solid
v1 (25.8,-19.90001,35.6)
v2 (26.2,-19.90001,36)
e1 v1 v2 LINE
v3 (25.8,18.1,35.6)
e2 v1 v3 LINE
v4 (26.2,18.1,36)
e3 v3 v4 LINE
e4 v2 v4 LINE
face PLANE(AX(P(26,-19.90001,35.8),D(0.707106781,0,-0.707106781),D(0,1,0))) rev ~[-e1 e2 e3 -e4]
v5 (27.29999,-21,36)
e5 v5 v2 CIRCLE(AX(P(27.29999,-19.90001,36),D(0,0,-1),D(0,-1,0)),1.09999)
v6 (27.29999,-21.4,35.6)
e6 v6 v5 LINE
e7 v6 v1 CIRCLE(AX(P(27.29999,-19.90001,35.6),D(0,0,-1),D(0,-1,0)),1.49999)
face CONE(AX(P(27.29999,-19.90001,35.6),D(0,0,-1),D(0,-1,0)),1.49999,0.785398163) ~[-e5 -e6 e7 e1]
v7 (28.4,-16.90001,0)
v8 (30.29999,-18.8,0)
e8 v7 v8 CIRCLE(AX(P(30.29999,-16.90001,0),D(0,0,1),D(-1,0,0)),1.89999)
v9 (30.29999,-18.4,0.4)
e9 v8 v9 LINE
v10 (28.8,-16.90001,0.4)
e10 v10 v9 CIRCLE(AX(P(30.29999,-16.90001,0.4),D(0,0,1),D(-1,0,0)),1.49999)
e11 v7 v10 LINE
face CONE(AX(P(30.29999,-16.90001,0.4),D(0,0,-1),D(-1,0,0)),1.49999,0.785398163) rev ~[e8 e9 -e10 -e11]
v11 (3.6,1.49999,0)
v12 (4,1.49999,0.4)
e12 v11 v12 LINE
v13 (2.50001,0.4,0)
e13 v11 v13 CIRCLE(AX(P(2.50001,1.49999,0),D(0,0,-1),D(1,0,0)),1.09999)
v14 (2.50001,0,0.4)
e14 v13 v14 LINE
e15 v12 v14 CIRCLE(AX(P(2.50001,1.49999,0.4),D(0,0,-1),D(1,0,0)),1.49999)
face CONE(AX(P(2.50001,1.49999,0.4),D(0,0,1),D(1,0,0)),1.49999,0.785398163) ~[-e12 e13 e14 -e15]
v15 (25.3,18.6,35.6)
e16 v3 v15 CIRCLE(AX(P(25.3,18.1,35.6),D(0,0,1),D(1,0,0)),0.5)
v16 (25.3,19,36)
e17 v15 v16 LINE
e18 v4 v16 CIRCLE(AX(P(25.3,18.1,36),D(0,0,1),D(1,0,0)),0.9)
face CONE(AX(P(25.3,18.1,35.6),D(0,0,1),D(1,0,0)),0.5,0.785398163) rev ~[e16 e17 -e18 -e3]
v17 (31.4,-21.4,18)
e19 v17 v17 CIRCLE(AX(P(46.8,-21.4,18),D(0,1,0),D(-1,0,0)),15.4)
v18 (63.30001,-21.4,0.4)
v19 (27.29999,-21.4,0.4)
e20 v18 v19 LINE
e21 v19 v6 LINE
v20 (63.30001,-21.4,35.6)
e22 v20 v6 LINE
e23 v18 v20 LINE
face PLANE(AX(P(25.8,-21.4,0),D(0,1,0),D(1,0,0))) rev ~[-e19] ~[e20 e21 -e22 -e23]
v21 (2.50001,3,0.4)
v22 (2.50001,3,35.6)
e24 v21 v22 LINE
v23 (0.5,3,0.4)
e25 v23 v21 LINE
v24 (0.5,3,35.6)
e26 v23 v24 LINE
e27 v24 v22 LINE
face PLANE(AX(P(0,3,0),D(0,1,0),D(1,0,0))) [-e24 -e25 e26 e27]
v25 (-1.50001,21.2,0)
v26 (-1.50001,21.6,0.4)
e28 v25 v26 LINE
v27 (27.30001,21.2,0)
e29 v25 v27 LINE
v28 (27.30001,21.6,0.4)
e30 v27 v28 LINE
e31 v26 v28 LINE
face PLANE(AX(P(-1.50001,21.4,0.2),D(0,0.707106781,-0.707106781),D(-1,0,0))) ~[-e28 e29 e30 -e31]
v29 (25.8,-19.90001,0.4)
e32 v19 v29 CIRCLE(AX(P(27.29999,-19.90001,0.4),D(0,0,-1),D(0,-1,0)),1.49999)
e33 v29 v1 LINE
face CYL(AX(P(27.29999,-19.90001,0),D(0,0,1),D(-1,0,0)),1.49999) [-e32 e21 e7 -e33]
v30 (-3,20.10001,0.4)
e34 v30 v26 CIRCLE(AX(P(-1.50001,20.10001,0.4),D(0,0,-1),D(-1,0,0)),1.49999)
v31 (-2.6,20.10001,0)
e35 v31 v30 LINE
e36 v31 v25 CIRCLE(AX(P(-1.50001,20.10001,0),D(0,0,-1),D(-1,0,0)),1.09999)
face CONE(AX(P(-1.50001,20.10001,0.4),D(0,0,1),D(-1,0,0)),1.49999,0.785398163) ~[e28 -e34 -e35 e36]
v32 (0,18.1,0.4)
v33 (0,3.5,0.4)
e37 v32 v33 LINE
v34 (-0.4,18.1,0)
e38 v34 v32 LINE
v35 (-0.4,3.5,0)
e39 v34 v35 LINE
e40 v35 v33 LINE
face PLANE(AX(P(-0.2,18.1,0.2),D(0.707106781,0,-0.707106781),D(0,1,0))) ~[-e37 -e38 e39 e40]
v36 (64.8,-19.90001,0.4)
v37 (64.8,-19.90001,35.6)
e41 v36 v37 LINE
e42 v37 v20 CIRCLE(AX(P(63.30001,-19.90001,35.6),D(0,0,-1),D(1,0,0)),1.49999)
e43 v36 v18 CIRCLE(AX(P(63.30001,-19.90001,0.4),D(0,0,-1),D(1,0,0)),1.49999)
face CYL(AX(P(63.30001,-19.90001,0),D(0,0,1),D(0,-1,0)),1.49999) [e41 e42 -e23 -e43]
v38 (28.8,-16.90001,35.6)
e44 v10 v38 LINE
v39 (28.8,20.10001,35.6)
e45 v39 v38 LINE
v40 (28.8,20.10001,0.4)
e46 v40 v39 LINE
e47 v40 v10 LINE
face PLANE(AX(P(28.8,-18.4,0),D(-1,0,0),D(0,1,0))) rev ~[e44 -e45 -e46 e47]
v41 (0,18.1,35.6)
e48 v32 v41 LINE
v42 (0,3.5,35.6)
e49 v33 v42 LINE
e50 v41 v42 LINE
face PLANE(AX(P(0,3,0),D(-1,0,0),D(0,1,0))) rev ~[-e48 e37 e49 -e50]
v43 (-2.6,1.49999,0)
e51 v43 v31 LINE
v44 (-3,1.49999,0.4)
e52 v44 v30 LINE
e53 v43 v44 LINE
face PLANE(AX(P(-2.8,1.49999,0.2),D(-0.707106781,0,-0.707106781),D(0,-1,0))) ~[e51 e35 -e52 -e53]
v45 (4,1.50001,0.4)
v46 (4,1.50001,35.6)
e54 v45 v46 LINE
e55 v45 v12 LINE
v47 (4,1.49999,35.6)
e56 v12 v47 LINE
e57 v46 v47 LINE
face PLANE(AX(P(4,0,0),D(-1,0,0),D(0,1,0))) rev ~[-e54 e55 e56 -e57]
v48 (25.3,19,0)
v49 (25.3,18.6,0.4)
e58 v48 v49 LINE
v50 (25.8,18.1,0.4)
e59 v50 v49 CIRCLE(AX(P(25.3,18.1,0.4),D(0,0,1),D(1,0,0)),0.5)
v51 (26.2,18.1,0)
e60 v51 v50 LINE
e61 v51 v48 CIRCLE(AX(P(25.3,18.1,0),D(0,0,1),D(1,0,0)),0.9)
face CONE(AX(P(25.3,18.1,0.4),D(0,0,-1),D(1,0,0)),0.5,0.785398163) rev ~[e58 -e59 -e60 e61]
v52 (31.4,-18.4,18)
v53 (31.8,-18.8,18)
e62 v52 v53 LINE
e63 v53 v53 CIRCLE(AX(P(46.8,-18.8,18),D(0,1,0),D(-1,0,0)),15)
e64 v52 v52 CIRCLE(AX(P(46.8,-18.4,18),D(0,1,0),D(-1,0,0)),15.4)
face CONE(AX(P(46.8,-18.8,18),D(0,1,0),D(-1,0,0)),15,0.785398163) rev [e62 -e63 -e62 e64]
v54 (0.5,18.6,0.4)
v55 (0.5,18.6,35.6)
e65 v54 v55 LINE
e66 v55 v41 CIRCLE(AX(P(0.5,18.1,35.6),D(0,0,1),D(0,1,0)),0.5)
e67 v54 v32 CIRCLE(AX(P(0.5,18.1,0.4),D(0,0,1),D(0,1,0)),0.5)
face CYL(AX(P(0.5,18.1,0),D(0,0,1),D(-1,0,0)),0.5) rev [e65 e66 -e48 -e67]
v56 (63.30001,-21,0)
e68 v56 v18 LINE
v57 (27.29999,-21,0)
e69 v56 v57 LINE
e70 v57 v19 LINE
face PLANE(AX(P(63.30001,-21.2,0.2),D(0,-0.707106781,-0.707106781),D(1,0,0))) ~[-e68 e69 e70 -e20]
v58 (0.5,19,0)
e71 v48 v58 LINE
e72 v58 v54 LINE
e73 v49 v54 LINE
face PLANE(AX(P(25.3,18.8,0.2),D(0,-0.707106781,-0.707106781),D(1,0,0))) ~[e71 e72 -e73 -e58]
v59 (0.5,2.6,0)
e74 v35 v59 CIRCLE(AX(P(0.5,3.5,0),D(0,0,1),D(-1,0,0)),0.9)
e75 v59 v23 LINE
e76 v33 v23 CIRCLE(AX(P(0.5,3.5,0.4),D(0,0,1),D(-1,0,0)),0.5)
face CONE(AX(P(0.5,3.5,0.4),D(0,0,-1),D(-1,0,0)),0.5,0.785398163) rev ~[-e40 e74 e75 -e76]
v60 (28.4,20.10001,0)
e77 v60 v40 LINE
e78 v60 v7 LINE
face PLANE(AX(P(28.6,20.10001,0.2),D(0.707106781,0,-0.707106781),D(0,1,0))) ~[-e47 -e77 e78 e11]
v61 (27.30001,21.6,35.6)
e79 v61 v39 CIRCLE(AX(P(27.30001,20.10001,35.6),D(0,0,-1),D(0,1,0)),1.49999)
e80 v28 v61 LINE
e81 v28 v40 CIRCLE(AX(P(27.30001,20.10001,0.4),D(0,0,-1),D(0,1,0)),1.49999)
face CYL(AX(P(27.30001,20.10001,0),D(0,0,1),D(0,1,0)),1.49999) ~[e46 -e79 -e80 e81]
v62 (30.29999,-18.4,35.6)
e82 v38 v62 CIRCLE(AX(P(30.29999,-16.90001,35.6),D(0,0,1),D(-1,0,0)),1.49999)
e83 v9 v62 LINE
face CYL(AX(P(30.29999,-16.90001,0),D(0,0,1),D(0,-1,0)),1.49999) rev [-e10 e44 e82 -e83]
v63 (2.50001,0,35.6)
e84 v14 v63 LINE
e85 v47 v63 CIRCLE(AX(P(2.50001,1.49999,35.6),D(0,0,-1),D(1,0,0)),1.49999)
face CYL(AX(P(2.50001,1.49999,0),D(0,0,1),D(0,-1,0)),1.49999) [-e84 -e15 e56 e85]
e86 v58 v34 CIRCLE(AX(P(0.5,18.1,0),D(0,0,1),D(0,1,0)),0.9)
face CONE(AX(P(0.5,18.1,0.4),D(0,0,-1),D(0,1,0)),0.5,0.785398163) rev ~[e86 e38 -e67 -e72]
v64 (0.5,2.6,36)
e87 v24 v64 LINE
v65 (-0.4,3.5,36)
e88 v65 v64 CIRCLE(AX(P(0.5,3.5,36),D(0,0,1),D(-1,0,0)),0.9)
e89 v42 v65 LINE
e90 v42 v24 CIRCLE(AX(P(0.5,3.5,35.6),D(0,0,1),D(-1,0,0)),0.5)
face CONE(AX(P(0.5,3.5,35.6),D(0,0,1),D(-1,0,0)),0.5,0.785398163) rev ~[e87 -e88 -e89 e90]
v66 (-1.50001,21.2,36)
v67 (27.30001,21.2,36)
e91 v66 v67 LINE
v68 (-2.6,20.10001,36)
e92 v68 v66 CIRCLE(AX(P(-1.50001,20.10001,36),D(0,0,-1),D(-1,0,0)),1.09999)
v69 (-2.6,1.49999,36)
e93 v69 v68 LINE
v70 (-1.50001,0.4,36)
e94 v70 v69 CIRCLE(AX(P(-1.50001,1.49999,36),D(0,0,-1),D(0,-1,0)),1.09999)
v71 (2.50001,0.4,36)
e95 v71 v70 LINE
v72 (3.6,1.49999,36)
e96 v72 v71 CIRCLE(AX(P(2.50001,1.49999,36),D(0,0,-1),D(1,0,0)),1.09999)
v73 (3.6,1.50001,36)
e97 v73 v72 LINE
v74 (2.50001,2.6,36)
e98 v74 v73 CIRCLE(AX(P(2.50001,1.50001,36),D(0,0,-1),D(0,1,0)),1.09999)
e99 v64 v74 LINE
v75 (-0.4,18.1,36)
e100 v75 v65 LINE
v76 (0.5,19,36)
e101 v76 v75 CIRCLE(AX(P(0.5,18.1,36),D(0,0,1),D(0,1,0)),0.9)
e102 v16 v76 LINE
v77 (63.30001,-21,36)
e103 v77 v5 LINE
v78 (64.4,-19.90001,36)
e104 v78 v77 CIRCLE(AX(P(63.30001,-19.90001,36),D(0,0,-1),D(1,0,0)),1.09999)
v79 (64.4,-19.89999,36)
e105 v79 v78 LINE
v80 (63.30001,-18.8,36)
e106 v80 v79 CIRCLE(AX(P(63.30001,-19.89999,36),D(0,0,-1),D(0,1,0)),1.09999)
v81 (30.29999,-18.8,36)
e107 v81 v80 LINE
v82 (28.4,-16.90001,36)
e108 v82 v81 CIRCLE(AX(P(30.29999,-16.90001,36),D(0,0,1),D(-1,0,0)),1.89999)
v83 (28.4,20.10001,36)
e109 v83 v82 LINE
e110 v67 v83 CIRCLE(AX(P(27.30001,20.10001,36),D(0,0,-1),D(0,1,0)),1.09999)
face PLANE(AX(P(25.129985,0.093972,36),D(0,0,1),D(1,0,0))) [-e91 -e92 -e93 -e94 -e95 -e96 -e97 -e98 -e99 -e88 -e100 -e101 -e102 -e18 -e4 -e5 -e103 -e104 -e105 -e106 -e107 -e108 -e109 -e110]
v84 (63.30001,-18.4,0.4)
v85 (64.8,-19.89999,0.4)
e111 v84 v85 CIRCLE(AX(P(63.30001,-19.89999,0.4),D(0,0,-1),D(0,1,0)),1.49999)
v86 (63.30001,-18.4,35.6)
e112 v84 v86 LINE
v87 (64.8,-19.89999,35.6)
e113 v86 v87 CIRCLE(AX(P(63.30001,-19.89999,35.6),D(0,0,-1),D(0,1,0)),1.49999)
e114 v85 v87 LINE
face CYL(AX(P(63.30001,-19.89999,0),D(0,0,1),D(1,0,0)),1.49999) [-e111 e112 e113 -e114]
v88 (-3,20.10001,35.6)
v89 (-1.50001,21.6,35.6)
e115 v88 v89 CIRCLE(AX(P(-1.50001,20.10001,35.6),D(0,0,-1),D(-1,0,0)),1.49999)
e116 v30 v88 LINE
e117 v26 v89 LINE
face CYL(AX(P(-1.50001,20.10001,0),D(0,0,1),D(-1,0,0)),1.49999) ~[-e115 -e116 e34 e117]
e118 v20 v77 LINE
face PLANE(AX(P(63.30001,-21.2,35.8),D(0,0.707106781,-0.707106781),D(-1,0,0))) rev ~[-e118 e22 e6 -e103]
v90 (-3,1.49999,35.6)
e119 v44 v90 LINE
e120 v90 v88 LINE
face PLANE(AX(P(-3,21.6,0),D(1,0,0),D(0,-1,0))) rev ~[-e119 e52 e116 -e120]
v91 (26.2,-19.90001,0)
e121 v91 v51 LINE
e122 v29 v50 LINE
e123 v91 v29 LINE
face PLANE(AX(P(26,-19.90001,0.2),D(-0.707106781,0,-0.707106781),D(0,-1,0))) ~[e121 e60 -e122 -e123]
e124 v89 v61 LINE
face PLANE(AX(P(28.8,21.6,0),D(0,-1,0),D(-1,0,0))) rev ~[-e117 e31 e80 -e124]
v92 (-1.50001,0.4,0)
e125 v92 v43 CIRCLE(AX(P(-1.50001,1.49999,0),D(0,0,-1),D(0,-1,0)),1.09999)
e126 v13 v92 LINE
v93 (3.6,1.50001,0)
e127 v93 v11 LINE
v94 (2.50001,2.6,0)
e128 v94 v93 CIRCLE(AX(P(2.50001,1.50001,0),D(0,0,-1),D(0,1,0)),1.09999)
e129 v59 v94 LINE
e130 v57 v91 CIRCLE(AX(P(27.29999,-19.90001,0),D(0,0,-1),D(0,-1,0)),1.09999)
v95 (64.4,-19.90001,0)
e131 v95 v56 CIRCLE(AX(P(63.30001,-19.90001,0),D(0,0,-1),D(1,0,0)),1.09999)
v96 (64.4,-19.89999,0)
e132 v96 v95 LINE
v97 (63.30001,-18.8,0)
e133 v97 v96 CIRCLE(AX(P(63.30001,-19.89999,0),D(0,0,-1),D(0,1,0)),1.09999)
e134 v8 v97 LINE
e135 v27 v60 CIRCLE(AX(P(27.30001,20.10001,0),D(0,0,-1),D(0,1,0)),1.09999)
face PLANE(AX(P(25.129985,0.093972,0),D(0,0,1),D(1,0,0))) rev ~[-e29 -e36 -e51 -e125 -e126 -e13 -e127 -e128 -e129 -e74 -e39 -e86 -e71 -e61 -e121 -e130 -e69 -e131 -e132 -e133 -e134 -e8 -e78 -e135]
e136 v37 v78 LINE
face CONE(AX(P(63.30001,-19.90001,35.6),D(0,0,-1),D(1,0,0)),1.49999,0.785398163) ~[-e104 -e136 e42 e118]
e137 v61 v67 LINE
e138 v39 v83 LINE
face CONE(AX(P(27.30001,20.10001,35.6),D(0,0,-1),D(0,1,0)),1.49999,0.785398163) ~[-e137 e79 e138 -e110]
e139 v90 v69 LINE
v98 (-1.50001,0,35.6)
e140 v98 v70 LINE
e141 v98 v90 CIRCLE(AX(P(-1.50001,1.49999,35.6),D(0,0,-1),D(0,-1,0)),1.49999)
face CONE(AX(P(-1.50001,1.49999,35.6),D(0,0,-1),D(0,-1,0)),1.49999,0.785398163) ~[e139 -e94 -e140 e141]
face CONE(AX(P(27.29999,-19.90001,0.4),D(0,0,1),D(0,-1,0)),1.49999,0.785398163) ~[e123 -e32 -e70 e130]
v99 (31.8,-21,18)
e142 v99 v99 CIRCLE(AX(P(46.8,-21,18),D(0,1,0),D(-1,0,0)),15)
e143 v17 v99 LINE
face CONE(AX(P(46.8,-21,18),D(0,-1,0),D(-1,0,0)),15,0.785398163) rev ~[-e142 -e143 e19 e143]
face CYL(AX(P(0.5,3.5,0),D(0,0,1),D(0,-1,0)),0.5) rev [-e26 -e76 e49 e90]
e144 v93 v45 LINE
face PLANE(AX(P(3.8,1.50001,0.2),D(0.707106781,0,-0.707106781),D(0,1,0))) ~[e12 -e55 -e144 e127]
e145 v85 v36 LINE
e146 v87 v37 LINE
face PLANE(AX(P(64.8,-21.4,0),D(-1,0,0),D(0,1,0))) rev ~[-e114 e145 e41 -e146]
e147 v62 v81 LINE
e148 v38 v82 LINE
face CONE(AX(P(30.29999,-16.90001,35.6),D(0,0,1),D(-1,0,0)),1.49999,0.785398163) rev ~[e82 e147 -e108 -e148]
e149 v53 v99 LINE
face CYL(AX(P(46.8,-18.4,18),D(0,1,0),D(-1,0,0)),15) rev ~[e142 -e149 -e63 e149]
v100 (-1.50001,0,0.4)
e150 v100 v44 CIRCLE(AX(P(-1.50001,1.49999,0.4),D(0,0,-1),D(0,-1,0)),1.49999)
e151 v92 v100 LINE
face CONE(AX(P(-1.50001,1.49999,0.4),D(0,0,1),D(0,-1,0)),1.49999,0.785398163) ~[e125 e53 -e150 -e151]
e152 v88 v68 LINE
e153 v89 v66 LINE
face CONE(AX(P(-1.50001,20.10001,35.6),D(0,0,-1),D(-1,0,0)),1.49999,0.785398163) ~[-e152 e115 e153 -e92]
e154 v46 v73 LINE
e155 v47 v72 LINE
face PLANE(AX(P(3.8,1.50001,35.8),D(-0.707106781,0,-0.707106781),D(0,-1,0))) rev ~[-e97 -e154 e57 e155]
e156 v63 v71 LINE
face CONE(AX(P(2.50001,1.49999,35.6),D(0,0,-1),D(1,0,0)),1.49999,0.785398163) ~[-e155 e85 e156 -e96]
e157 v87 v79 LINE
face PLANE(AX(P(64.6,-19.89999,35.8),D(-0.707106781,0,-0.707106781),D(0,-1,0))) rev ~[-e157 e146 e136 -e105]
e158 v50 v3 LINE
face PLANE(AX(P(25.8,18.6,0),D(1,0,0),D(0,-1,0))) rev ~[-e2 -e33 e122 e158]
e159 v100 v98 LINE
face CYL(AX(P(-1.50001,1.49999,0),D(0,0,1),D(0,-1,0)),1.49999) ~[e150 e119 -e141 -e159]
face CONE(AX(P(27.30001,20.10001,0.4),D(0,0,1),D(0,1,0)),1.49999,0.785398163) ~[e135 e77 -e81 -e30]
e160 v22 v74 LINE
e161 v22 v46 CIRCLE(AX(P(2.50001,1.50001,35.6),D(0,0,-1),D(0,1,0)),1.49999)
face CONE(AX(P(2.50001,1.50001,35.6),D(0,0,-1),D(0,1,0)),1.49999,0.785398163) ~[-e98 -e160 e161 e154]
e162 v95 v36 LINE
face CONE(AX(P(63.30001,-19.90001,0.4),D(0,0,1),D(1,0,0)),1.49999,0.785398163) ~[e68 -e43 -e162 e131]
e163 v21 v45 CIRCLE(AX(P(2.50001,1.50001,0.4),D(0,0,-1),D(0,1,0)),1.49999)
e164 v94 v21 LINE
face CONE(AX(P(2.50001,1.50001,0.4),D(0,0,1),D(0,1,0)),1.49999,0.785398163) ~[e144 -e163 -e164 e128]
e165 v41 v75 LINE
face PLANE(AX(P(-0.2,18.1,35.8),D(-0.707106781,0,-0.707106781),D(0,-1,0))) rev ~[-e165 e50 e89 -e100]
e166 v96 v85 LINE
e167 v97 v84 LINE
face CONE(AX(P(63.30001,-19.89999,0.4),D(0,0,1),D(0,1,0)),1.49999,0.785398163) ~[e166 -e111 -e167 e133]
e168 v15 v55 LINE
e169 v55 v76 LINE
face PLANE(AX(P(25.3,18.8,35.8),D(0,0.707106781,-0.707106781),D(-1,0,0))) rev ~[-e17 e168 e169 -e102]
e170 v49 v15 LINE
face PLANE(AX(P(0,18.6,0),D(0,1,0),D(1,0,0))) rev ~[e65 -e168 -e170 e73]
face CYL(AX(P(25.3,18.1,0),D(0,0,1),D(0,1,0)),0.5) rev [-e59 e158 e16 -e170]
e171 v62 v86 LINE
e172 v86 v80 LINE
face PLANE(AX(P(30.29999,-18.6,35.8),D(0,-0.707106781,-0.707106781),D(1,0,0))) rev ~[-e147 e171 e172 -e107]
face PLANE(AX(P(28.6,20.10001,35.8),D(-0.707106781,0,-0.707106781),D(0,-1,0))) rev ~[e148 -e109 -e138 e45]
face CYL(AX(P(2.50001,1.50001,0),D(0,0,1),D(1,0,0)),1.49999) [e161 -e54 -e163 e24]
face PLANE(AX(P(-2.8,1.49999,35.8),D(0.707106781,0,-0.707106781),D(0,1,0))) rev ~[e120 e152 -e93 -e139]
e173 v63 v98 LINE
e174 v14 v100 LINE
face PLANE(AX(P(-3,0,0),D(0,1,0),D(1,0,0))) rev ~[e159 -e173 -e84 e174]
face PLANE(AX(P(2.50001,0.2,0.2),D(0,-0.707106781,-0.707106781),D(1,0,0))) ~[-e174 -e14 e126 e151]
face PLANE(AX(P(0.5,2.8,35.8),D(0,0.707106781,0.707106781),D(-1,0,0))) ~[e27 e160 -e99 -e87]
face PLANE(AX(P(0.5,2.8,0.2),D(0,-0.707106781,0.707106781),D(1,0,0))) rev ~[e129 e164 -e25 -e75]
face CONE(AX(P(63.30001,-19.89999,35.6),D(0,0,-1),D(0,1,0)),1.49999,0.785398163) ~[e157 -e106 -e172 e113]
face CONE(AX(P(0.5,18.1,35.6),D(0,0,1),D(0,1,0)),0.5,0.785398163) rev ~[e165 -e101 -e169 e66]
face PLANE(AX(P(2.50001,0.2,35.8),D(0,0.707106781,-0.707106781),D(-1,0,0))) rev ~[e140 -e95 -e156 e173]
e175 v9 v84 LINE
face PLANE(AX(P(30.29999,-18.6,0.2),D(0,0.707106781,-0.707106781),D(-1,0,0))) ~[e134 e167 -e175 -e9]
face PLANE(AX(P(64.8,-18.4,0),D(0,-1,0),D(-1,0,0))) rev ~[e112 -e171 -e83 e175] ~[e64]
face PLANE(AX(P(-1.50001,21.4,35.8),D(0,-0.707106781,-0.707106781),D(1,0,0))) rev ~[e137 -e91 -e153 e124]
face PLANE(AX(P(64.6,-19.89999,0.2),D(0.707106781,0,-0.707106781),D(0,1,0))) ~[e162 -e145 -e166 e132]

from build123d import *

# Parameters (mm, degrees)
F0_W     = 4
F0_H     = 3
F1_DEPTH = 36
F2_R     = 15
F3_DEPTH = 25
F4_R     = 1.49999
F5_R     = 0.5
F6_SIZE  = 0.4


# Not quite as in the source:
# - a fillet or chamfer is up to 0.001 mm smaller than in the source, because OpenCascade refuses the exact size
# - a feature names something its author has since deleted; it is built from what else it names


with BuildPart() as f1:
    # F0 (on Top) → F1 (new body)
    with BuildSketch(Plane.XY):
        Polygon((-3, 0), (0, 0), (0, 3), (0, 18.6), (25.8, 18.6), (25.8, -21.4), (64.8, -21.4), (64.8, -18.4), (28.8, -18.4), (28.8, 21.6), (-3, 21.6), align=None)
        with Locations((2, 1.5)):
            Rectangle(F0_W, F0_H)
    extrude(amount=F1_DEPTH)

    # F2 (on face) → F3 (cut)
    with BuildSketch(Plane(origin=(0, -18.4, 0), x_dir=(-1, 0, 0), z_dir=(0, 1, 0))):
        with Locations((-46.8, 18)):
            Circle(F2_R)
    extrude(amount=-F3_DEPTH, mode=Mode.SUBTRACT)

    # F4 (radius 1.5 in the source; OpenCascade refuses exactly that, so slightly less here)
    f4_edges = [f1.edges().sort_by_distance(p)[0] for p in [
        (-3, 0, 18),
        (-3, 21.6, 18),
        (28.8, 21.6, 18),
        (28.8, -18.4, 18),
        (25.8, -21.4, 18),
        (4, 3, 18),
        (4, 0, 18),
        (64.8, -21.4, 18),
        (64.8, -18.4, 18),
    ]]
    fillet(f4_edges, radius=F4_R)

    # F5
    f5_edges = [f1.edges().sort_by_distance(p)[0] for p in [
        (0, 18.6, 18),
        (25.8, 18.6, 18),
        (0, 3, 18),
    ]]
    fillet(f5_edges, radius=F5_R)

    # F6
    f6_edges = [f1.edges().sort_by_distance(p)[0] for p in [
        (1.500005, 3, 36),
        (0.146447, 3.146447, 36),
        (3.560663, 2.560663, 36),
        (0, 10.8, 36),
        (4, 1.5, 36),
        (0.146447, 18.453553, 36),
        (3.560663, 0.439337, 36),
        (12.9, 18.6, 36),
        (0.5, 0, 36),
        (25.653553, 18.453553, 36),
        (-2.560663, 0.439337, 36),
        (25.8, -0.900005, 36),
        (-3, 10.8, 36),
        (26.239337, -20.960663, 36),
        (-2.560663, 21.160663, 36),
        (45.3, -21.4, 36),
        (12.9, 21.6, 36),
        (64.360663, -20.960663, 36),
        (28.360663, 21.160663, 36),
        (64.8, -19.9, 36),
        (28.8, 1.6, 36),
        (64.360663, -18.839337, 36),
        (29.239337, -17.960663, 36),
        (46.8, -18.4, 36),
        (1.500005, 3, 0),
        (0.146447, 3.146447, 0),
        (3.560663, 2.560663, 0),
        (0, 10.8, 0),
        (4, 1.5, 0),
        (0.146447, 18.453553, 0),
        (3.560663, 0.439337, 0),
        (12.9, 18.6, 0),
        (0.5, 0, 0),
        (25.653553, 18.453553, 0),
        (-2.560663, 0.439337, 0),
        (25.8, -0.900005, 0),
        (-3, 10.8, 0),
        (26.239337, -20.960663, 0),
        (-2.560663, 21.160663, 0),
        (45.3, -21.4, 0),
        (12.9, 21.6, 0),
        (64.360663, -20.960663, 0),
        (28.360663, 21.160663, 0),
        (64.8, -19.9, 0),
        (28.8, 1.6, 0),
        (64.360663, -18.839337, 0),
        (29.239337, -17.960663, 0),
        (46.8, -18.4, 0),
        (61.8, -18.4, 18),
        (61.8, -21.4, 18),
    ]]
    chamfer(f6_edges, length=F6_SIZE)


solid = f1.part
